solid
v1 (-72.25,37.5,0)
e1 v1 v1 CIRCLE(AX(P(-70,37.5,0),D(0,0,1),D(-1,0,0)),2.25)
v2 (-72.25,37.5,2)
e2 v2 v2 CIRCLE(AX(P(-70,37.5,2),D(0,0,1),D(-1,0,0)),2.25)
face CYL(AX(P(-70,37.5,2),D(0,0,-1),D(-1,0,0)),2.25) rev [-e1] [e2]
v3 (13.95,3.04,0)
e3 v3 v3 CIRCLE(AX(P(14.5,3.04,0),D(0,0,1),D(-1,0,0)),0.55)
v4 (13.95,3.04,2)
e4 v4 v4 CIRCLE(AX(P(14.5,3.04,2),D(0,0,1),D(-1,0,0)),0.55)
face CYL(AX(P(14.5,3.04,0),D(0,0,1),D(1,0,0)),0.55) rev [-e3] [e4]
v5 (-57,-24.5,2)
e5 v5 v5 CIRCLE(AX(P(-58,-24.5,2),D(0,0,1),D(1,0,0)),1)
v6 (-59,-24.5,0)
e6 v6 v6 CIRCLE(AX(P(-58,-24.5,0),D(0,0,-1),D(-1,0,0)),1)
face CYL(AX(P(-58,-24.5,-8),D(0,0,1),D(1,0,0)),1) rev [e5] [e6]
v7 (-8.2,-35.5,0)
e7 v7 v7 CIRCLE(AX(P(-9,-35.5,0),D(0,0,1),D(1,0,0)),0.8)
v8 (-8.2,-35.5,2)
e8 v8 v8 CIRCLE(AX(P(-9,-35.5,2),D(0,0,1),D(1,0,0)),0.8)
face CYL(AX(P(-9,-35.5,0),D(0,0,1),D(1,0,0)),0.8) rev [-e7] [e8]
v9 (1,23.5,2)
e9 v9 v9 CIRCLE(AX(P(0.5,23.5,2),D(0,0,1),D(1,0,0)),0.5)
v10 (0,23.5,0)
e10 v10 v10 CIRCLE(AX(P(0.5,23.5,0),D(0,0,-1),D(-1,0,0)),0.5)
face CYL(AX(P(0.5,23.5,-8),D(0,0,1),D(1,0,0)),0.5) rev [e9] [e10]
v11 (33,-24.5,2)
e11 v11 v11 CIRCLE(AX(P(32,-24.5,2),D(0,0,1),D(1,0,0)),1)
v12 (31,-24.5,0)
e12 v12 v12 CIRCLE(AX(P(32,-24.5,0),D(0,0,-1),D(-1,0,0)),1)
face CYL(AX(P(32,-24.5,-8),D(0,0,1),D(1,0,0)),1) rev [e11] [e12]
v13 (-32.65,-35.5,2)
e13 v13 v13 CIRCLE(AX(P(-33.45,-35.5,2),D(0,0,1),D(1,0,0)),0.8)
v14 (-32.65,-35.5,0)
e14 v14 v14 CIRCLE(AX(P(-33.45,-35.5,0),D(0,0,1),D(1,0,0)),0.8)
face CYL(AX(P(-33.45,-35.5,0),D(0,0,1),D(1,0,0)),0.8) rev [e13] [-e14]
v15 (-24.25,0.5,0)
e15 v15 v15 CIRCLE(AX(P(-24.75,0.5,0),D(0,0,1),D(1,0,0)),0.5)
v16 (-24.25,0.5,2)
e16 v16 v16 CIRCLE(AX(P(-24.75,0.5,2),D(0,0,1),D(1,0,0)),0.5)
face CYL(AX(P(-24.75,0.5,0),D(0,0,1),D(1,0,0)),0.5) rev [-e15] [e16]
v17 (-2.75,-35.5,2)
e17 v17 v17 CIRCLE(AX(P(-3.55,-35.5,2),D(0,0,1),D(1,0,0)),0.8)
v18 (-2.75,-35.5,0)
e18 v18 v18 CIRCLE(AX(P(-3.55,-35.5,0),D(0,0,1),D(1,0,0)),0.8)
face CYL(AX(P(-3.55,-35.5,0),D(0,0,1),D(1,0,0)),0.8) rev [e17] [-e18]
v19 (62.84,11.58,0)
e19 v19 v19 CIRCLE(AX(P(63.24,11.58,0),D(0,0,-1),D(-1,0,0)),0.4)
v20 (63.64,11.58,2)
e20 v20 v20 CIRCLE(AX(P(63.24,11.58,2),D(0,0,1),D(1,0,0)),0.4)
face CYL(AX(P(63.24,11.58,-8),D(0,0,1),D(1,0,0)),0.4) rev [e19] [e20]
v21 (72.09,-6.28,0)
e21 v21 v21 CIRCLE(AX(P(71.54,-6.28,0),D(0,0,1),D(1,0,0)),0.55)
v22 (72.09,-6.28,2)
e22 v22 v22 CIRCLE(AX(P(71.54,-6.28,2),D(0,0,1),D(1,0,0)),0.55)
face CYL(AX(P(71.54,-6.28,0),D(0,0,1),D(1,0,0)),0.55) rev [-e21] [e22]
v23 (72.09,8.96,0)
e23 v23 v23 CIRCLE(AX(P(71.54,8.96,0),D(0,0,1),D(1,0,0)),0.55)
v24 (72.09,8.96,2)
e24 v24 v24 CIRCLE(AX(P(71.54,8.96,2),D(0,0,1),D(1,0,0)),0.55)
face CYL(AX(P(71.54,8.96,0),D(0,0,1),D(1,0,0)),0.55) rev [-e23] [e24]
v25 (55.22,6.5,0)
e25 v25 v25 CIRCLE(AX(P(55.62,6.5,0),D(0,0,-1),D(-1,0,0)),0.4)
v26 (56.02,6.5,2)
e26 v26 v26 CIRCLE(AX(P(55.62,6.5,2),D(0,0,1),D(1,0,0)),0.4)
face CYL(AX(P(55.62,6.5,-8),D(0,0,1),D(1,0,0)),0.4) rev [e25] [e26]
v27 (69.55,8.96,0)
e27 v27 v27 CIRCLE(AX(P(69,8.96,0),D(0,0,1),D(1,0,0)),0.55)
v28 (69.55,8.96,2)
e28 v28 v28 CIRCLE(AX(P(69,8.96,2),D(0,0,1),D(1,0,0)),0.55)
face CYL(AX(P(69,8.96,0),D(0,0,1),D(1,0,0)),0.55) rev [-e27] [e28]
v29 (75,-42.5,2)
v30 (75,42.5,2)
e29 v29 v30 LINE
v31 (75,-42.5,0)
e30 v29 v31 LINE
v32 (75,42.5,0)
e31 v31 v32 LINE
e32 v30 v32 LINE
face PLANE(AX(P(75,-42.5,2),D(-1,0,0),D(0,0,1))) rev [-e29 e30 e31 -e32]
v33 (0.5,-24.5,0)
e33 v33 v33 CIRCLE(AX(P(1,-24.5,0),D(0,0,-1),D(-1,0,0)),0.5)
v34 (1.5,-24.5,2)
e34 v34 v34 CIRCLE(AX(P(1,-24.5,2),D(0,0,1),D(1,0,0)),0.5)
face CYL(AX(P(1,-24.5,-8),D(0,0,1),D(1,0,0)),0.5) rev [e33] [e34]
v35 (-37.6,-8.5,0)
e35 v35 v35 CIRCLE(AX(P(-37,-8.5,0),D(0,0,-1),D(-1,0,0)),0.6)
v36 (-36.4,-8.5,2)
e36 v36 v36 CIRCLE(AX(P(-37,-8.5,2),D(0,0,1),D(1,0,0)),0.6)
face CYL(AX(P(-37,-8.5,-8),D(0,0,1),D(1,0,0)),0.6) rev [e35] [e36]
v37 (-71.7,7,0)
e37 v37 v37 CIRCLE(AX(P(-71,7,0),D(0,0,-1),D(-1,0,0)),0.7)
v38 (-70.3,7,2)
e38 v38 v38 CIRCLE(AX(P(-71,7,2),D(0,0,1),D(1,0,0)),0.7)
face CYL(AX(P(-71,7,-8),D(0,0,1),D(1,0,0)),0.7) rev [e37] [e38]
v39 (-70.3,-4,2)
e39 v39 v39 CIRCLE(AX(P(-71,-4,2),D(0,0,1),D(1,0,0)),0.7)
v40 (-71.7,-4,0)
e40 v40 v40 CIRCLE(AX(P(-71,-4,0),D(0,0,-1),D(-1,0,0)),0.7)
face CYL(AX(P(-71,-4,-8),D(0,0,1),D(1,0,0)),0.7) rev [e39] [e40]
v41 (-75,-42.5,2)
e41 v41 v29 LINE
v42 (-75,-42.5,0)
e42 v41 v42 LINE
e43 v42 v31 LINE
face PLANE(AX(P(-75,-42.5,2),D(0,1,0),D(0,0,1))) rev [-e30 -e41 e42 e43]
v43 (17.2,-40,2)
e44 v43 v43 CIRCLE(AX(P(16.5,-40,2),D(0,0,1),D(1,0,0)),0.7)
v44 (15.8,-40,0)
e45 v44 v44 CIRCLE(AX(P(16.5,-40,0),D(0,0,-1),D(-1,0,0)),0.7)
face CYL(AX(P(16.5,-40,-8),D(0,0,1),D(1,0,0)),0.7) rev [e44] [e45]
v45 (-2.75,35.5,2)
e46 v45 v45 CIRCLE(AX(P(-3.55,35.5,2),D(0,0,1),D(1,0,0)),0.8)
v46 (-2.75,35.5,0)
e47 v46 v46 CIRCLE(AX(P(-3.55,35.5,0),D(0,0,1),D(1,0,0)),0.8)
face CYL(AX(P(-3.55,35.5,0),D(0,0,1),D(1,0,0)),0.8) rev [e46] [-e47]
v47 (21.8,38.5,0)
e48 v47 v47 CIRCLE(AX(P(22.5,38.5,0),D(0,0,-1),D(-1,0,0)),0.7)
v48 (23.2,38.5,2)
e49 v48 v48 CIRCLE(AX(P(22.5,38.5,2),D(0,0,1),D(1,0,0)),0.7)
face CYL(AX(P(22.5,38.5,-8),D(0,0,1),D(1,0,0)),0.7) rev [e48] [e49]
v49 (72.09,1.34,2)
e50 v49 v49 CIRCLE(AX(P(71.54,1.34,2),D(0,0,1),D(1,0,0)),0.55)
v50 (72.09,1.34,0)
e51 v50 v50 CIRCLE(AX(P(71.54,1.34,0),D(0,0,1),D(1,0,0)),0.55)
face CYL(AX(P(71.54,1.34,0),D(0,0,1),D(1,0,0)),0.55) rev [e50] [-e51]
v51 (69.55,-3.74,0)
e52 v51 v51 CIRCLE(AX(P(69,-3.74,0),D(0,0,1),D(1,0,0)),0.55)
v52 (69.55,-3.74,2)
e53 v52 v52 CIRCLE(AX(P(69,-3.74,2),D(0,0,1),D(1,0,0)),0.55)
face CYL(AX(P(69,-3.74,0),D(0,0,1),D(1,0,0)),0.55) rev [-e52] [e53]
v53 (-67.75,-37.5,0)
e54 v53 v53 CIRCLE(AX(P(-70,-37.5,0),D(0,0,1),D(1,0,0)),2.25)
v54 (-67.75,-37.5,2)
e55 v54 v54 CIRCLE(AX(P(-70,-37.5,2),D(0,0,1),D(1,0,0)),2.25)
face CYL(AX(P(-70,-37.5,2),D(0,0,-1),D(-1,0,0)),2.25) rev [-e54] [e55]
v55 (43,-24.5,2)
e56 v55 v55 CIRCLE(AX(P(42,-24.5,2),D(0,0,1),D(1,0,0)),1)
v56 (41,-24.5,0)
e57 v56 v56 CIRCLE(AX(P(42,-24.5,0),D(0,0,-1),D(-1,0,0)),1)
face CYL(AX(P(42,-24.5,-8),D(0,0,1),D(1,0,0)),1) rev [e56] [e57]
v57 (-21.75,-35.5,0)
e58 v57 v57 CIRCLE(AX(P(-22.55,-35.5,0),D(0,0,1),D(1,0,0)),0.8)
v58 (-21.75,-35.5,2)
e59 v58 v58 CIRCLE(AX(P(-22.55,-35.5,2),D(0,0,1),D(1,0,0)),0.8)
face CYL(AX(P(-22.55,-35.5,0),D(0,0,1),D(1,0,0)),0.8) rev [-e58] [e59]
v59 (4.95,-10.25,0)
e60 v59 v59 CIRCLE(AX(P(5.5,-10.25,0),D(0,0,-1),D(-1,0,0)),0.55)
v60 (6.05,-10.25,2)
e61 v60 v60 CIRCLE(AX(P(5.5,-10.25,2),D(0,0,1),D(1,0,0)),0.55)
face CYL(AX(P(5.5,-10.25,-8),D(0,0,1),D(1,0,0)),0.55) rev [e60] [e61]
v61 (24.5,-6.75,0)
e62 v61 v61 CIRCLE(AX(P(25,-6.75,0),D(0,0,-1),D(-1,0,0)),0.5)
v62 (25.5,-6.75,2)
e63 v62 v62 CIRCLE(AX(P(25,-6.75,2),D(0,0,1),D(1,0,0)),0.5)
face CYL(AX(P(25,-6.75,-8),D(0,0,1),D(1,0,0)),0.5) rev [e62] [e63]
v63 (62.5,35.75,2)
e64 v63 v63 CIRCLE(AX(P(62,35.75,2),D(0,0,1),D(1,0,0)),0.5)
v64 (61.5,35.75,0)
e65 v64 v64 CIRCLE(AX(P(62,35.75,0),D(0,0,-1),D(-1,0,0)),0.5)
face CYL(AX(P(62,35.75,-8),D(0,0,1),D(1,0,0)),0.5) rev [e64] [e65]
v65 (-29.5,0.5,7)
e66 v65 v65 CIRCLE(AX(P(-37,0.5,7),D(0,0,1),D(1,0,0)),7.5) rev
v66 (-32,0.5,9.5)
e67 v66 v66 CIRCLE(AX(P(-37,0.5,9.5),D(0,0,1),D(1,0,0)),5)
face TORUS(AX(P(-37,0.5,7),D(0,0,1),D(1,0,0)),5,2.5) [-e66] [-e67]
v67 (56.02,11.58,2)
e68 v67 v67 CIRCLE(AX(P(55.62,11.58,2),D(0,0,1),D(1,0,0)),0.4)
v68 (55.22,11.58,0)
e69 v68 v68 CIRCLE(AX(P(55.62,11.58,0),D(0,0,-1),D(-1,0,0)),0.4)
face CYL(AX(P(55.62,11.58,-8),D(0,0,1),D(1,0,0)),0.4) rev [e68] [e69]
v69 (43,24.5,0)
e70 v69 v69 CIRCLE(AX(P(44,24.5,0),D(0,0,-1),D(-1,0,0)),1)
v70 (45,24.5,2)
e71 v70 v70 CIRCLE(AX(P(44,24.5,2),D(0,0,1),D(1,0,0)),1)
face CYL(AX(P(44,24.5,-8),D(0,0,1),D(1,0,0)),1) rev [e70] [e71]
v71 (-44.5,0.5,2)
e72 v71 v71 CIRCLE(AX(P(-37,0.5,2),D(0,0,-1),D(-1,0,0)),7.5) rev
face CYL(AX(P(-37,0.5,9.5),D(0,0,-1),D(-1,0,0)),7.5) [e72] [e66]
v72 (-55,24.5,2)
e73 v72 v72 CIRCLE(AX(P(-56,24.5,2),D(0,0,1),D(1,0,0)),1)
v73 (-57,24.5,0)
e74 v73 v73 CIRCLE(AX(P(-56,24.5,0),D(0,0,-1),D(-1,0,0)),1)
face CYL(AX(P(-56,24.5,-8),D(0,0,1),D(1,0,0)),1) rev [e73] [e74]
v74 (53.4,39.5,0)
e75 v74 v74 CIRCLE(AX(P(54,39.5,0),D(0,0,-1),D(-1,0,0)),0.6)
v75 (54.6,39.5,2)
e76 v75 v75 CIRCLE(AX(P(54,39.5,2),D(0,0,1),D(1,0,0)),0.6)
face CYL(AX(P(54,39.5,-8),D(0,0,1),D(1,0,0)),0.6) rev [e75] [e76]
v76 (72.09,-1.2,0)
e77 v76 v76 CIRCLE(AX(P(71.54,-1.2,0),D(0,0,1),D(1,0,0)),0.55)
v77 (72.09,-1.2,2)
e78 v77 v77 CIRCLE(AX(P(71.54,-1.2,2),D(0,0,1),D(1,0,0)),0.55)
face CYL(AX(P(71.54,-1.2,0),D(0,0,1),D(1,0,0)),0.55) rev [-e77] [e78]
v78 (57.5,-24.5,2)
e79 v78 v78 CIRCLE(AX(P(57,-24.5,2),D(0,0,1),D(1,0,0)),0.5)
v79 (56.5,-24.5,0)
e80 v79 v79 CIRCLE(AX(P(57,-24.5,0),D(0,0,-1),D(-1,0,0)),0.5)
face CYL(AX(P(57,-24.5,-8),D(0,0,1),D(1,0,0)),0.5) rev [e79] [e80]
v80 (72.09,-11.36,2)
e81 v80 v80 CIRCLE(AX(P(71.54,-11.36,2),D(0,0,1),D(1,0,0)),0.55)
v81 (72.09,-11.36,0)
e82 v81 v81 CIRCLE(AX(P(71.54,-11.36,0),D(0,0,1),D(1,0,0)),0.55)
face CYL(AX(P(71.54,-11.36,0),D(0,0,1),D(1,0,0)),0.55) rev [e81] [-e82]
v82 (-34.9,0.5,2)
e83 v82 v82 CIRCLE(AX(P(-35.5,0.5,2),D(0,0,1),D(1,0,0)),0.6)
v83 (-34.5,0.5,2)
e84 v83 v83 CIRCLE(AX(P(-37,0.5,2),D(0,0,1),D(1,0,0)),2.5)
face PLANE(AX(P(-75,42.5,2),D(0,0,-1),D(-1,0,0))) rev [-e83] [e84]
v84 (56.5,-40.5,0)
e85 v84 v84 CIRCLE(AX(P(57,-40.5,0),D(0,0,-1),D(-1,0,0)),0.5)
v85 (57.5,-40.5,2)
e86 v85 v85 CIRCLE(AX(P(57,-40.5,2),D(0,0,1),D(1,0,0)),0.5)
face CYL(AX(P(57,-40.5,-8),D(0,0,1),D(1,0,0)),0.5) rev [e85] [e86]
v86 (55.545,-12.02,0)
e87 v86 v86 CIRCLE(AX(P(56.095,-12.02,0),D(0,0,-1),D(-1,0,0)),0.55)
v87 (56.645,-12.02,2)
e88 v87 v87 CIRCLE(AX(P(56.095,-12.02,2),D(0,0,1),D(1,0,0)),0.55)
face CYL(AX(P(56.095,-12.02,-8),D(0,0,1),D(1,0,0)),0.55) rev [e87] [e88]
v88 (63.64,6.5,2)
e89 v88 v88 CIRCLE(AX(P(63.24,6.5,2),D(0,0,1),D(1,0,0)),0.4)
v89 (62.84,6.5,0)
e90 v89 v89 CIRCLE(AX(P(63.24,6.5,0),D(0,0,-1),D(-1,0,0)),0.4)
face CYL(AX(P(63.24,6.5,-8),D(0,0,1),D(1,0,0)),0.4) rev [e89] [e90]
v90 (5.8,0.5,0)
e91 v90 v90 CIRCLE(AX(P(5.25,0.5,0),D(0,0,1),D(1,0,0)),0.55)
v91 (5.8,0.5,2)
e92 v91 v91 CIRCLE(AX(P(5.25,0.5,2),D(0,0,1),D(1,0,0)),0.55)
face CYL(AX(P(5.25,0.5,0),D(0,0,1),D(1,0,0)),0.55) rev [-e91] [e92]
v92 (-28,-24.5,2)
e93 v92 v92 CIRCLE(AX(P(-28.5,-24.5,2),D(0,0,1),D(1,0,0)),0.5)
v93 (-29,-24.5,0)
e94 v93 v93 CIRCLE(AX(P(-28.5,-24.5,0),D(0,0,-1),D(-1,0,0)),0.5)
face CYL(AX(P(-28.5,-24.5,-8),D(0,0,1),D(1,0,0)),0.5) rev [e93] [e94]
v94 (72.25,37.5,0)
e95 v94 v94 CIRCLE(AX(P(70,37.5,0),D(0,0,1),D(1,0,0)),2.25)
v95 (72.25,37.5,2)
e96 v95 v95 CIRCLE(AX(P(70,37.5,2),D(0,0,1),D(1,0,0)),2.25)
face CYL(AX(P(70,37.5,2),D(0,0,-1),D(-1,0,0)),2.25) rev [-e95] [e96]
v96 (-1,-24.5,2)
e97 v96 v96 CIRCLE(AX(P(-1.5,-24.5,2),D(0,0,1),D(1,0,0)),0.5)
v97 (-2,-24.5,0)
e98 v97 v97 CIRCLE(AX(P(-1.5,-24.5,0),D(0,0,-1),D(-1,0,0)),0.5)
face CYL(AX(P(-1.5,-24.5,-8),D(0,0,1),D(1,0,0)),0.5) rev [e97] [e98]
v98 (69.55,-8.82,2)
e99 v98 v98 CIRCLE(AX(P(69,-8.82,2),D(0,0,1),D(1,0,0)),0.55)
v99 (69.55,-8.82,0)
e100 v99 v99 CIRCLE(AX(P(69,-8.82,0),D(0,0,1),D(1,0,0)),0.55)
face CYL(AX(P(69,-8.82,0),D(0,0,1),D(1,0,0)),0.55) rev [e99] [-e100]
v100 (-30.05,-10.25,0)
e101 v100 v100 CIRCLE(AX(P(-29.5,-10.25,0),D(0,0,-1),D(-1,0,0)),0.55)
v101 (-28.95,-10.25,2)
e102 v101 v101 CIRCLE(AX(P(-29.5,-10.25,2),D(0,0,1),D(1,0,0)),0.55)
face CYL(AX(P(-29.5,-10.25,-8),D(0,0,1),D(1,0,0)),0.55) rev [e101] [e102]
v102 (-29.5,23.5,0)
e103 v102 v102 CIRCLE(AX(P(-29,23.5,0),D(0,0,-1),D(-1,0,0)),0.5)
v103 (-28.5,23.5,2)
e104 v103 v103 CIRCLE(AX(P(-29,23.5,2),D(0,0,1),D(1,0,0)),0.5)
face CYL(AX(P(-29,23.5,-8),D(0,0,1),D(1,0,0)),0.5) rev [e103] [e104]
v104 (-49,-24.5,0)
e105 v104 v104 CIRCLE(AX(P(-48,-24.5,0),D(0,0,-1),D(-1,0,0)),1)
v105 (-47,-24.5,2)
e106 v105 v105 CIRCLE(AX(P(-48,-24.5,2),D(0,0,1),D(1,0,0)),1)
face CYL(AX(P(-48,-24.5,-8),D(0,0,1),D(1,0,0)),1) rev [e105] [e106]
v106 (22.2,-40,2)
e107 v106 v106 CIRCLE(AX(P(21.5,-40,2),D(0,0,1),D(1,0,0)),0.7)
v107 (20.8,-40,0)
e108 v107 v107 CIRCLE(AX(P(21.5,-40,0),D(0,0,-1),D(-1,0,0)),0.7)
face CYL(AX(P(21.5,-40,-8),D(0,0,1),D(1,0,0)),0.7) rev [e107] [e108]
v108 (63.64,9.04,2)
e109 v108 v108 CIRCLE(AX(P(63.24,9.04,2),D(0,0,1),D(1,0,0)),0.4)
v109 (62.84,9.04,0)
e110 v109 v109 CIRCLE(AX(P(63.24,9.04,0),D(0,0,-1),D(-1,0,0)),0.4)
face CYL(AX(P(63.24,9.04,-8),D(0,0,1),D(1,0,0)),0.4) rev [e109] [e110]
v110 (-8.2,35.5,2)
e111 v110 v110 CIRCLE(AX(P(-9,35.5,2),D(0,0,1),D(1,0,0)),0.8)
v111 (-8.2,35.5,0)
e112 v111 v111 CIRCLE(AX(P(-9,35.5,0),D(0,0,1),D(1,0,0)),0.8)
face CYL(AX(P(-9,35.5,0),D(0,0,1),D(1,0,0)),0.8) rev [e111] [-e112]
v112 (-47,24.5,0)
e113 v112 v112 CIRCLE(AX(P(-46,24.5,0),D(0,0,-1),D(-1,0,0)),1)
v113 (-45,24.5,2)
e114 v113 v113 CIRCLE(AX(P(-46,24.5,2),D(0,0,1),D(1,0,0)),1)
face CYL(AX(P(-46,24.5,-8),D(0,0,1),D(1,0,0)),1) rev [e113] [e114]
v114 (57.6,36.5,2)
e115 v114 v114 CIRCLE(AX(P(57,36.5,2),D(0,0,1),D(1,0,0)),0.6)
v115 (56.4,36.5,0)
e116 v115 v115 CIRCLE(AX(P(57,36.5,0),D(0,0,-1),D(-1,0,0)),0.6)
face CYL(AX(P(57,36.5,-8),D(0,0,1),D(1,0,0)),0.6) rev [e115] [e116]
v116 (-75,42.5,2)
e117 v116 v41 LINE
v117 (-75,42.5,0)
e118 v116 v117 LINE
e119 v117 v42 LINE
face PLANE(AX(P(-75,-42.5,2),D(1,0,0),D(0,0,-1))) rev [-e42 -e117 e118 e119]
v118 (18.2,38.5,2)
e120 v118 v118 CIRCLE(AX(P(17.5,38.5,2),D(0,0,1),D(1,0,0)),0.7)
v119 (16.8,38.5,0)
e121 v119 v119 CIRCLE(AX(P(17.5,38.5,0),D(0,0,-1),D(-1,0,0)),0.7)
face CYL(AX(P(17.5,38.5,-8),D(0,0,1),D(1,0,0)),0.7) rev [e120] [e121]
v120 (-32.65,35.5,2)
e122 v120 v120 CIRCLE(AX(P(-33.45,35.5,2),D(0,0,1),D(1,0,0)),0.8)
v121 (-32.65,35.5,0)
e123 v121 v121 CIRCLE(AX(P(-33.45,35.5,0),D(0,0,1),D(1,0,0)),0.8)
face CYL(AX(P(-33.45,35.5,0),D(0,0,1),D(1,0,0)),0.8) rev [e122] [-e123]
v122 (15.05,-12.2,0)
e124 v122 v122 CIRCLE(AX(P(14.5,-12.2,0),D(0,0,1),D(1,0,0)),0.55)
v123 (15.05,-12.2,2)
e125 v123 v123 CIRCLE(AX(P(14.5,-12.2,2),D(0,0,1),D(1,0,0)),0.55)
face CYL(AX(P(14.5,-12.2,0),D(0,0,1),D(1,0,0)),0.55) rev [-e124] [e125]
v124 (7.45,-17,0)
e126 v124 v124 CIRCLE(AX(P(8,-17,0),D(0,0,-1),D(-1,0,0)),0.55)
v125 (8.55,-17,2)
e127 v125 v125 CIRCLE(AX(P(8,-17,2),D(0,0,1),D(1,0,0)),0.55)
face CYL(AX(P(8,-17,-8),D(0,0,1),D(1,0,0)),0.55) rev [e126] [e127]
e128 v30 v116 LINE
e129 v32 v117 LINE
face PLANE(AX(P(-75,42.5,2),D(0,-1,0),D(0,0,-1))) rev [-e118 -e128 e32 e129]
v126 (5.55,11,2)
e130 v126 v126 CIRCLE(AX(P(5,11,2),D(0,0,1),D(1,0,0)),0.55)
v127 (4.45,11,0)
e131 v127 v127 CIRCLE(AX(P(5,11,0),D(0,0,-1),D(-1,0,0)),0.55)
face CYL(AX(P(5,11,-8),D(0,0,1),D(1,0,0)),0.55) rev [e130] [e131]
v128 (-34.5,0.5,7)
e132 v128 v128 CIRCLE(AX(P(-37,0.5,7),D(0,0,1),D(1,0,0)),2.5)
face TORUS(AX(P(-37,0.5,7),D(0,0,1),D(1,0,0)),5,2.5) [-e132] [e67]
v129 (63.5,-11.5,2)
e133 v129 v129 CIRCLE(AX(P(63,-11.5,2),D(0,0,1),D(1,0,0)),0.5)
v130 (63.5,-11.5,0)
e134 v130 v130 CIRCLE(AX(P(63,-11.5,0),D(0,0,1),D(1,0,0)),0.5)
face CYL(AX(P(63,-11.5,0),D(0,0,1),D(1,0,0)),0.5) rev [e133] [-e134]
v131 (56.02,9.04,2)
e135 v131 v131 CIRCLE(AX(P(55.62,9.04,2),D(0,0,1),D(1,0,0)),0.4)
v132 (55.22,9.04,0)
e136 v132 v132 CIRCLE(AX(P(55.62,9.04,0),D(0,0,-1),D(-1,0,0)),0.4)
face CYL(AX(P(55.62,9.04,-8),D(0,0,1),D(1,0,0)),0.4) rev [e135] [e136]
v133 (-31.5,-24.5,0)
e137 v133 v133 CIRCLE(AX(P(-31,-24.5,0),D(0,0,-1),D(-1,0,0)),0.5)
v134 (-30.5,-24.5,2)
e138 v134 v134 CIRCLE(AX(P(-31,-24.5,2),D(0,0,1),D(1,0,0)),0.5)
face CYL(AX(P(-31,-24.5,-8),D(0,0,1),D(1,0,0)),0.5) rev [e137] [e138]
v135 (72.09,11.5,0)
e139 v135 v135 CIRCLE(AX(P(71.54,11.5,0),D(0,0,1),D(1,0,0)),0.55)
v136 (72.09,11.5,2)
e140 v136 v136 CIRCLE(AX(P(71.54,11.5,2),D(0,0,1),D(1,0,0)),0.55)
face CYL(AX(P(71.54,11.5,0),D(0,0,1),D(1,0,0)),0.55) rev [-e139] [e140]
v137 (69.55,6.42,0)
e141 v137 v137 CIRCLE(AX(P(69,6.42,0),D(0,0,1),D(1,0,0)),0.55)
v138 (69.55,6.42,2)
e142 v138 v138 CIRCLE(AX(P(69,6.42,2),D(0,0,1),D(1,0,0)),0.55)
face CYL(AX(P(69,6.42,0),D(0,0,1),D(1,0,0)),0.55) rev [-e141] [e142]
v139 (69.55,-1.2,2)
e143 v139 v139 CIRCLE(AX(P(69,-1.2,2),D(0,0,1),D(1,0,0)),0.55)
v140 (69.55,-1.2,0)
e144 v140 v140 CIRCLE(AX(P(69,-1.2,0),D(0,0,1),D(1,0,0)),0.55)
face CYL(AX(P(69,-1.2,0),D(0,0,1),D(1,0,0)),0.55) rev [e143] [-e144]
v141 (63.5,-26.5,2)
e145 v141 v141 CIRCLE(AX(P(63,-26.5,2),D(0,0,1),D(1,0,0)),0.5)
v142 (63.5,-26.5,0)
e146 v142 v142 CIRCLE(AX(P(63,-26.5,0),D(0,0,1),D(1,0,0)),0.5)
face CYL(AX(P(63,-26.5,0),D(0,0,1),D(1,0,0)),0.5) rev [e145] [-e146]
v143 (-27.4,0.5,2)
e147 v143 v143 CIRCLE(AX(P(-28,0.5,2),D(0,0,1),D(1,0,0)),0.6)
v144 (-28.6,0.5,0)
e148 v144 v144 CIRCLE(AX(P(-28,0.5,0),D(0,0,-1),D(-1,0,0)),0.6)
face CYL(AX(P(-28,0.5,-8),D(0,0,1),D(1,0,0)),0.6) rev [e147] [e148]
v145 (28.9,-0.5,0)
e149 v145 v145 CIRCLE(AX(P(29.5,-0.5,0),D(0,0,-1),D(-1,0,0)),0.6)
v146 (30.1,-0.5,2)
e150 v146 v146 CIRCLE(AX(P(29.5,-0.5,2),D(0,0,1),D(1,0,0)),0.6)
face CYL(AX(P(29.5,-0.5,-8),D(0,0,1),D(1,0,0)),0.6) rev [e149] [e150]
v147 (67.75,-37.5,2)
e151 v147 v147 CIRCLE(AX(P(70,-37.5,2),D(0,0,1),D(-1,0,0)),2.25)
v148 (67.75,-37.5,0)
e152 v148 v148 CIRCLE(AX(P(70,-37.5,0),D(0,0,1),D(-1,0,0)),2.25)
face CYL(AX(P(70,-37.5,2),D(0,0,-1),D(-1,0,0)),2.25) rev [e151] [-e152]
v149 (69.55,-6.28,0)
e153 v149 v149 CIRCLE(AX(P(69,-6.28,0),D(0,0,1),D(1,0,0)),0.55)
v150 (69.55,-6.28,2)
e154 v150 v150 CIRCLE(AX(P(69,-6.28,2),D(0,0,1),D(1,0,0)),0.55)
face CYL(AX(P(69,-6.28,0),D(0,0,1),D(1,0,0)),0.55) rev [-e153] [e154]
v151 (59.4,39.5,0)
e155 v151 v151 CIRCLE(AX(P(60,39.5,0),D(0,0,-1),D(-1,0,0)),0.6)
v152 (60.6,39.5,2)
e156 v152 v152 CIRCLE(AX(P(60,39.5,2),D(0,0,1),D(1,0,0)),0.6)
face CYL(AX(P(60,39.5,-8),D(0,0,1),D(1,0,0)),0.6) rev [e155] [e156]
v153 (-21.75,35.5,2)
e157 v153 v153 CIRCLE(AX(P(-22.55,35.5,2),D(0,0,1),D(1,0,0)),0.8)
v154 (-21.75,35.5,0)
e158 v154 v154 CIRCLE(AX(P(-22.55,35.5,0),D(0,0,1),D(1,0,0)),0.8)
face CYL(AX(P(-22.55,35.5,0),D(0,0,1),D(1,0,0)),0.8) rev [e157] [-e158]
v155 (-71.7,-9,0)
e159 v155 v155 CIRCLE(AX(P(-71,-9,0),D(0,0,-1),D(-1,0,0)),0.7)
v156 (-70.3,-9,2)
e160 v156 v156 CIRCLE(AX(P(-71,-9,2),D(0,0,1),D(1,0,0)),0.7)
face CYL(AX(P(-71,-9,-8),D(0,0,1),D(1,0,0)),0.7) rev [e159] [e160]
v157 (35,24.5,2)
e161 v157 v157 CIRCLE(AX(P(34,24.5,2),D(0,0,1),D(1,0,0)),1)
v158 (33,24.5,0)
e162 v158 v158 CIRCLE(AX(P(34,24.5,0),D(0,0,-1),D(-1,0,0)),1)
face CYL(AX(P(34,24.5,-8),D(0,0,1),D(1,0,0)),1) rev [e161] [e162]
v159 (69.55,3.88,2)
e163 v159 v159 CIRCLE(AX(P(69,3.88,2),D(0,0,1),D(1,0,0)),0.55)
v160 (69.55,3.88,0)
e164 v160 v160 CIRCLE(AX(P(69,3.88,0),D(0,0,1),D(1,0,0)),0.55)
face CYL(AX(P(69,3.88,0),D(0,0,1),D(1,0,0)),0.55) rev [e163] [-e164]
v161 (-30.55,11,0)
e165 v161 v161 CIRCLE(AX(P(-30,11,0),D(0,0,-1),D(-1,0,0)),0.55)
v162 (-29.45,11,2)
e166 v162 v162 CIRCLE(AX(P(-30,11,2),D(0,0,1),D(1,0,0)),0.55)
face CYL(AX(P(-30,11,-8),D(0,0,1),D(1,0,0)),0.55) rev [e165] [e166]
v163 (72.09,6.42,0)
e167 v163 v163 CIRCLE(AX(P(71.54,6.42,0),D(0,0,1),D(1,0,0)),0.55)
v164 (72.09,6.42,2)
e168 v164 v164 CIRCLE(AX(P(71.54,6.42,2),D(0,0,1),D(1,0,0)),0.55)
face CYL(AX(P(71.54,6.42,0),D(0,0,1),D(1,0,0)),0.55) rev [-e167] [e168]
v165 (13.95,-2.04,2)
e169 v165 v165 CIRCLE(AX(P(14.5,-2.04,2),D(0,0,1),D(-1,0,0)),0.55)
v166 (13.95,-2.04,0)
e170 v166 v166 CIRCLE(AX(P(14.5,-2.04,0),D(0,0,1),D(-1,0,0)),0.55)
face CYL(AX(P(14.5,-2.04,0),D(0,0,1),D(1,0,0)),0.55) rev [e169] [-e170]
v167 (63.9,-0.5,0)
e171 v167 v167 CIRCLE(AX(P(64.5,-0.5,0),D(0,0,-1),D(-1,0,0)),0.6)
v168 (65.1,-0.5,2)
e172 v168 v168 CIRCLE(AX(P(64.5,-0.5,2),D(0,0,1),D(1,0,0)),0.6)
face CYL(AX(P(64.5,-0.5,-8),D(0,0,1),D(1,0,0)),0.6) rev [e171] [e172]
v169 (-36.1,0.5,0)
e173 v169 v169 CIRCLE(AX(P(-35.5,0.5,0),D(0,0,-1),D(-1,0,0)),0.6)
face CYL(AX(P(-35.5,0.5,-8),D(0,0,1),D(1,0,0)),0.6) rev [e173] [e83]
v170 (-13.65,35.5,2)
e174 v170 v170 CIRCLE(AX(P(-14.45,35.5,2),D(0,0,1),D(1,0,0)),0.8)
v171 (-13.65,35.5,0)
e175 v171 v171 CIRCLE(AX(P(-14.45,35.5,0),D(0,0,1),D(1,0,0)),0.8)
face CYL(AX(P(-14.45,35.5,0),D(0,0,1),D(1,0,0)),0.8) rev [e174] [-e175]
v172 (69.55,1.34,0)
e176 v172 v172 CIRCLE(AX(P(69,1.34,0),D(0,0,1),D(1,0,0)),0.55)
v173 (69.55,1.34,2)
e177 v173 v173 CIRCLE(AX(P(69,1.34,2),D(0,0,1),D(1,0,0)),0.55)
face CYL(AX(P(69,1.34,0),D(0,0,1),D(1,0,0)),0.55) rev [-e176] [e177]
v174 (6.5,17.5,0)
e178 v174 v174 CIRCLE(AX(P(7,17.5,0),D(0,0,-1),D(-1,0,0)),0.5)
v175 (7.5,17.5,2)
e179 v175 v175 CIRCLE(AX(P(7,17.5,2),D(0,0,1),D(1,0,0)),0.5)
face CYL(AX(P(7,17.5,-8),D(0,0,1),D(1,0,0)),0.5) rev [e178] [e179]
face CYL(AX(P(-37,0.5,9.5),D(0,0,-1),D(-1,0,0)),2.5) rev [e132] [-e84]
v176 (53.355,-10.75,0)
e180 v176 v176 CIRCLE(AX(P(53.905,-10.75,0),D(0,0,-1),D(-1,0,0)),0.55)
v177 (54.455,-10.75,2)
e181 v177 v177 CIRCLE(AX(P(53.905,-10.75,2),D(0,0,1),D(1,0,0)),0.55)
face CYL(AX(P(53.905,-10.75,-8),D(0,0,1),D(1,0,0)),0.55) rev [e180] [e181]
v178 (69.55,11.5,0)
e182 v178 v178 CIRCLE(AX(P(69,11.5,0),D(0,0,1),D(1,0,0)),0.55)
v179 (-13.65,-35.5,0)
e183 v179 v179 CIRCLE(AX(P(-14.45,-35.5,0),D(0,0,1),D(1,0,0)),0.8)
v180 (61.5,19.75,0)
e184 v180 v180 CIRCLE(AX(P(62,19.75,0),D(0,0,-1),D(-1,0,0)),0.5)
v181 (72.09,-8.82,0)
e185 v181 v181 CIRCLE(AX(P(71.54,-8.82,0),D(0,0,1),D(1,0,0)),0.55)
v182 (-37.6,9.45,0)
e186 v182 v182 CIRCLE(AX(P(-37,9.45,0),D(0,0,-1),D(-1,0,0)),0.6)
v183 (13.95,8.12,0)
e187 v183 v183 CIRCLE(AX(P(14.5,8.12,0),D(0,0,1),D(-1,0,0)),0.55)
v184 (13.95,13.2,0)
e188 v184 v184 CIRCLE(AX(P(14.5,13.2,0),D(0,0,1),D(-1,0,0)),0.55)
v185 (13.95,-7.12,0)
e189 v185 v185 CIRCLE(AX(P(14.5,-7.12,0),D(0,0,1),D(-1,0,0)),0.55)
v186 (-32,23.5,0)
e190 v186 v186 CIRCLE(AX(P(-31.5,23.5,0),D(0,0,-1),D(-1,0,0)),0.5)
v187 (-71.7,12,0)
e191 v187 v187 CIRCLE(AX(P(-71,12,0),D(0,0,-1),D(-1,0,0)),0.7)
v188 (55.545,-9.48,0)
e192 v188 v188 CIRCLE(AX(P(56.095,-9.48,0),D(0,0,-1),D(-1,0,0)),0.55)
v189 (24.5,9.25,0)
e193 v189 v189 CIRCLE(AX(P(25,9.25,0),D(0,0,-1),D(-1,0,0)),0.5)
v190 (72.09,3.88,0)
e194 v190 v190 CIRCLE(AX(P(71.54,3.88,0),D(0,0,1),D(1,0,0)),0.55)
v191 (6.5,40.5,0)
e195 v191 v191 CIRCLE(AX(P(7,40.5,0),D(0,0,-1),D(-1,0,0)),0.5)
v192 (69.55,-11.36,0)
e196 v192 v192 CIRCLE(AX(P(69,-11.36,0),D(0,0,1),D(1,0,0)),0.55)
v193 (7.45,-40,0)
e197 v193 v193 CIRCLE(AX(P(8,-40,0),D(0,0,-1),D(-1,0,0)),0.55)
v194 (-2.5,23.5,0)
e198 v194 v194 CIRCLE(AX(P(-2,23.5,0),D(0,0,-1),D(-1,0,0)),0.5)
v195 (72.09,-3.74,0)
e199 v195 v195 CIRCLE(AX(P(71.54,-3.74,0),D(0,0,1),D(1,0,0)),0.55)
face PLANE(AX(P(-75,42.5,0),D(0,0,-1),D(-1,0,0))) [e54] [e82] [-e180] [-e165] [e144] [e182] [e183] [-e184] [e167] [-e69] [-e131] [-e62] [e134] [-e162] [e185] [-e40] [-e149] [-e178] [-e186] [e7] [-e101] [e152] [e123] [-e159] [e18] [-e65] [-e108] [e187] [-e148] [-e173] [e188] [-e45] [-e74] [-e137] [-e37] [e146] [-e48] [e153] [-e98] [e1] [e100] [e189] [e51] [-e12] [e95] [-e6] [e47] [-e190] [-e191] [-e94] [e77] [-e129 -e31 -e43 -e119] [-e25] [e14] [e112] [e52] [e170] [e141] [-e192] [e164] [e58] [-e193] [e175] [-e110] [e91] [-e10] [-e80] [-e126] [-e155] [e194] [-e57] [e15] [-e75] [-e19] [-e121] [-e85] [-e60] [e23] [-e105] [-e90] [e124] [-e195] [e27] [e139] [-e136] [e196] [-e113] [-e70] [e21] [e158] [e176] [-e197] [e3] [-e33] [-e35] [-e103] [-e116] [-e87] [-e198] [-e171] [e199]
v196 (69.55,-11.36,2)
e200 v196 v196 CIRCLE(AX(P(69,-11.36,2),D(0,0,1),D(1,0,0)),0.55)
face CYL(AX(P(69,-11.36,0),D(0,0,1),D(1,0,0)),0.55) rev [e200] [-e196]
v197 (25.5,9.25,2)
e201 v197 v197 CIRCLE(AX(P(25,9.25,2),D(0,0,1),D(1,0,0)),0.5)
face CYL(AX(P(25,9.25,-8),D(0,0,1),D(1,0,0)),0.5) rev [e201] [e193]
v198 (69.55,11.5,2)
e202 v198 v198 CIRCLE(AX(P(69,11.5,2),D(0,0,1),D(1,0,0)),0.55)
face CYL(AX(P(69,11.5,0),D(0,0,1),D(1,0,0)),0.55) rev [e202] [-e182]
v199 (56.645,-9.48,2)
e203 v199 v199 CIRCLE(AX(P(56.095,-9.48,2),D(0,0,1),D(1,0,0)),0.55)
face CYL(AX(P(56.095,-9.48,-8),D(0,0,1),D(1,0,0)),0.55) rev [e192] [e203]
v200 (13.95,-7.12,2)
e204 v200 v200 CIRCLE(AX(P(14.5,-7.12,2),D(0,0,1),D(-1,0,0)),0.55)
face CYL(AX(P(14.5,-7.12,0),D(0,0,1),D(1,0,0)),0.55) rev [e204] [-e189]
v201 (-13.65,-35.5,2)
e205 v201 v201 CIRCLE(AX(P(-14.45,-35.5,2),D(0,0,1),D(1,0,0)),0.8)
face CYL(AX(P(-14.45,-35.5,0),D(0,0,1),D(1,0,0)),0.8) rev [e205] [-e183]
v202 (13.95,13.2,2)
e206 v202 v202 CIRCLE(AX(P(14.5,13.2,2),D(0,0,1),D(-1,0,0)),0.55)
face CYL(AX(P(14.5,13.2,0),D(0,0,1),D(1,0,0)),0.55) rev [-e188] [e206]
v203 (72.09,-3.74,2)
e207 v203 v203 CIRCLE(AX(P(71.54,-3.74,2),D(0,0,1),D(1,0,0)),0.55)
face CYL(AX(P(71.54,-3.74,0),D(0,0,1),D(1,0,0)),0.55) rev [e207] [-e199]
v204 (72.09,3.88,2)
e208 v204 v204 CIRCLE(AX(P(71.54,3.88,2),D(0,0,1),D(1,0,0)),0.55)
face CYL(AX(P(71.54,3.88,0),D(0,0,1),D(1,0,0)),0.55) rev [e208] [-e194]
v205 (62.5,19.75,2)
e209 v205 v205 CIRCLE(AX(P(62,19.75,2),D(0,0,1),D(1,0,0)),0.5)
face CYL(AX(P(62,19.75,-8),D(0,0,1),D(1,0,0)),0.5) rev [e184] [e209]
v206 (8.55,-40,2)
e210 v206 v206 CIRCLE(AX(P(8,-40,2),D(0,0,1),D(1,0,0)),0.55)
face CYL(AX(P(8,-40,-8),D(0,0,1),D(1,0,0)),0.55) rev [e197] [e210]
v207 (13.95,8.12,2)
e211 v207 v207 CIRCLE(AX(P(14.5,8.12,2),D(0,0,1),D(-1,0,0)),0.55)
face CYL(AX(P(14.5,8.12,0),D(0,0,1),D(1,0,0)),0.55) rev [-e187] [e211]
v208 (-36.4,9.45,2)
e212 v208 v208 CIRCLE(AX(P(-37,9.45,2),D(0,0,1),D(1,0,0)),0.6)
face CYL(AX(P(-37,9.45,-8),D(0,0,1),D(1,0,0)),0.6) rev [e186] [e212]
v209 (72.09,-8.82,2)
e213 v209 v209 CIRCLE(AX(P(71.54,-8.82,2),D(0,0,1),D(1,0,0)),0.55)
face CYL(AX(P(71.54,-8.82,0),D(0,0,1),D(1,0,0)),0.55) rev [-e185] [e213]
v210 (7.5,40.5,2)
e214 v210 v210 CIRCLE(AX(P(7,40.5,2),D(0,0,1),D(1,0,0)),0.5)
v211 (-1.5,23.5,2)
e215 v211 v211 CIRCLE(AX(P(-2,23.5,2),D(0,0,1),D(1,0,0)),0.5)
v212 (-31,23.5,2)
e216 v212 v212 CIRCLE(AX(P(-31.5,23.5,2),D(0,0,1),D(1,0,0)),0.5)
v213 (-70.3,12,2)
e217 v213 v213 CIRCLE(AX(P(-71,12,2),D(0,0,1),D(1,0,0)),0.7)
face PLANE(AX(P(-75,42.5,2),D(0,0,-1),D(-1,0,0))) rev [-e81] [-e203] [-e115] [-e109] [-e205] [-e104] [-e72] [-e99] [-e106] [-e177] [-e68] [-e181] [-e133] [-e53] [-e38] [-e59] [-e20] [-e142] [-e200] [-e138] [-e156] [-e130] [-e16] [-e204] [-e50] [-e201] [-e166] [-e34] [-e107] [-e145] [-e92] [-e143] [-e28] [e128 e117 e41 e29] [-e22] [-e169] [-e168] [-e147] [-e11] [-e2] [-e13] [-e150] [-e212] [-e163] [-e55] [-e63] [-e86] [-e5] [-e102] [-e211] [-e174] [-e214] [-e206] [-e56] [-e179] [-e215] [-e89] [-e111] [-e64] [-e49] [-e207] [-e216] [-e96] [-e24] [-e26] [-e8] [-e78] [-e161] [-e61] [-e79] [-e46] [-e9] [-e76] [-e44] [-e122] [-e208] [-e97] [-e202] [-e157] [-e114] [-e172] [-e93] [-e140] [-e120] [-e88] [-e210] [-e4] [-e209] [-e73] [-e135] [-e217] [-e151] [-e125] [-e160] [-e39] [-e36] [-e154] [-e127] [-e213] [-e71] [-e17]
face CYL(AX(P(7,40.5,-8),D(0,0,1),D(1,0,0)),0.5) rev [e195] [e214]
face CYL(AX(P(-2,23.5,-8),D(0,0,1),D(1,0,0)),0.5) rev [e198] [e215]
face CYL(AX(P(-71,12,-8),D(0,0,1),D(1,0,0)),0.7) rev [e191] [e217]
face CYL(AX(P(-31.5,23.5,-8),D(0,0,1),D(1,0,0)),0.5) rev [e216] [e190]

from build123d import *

# Parameters (mm, degrees)
SKETCH_1_W          = 150
SKETCH_1_H          = 85
SKETCH_1_R          = 2.25
EXTRUDE_1_DEPTH     = 2
SKETCH_2_R          = 0.55
SKETCH_2_R_2        = 0.5
SKETCH_2_R_3        = 0.8
CUT_EXTRUDE_1_DEPTH = 2
SKETCH_3_R          = 1
SKETCH_3_R_2        = 0.6
SKETCH_3_R_3        = 0.55
SKETCH_3_R_4        = 0.7
SKETCH_3_R_5        = 0.5
SKETCH_3_R_6        = 0.4
CUT_EXTRUDE_2_DEPTH = 10
SKETCH_4_R          = 0.6
SKETCH_4_R_2        = 0.5
SKETCH_4_R_3        = 0.55
CUT_EXTRUDE_3_DEPTH = 10
SKETCH_5_R          = 7.5
SKETCH_5_R_2        = 2.5
EXTRUDE_2_DEPTH     = 7.5
FILLET_1_R          = 2.5


with BuildPart() as part:
    # Эскиз1 → Вытянуть1 (new body)
    with BuildSketch(Plane.XY):
        Rectangle(SKETCH_1_W, SKETCH_1_H)
        with Locations((-70, -37.5)):
            Circle(SKETCH_1_R, mode=Mode.SUBTRACT)
        with Locations(Location((70, -37.5, 0), (0, 0, 180))):
            Circle(SKETCH_1_R, mode=Mode.SUBTRACT)
        with Locations((70, 37.5)):
            Circle(SKETCH_1_R, mode=Mode.SUBTRACT)
        with Locations(Location((-70, 37.5, 0), (0, 0, 180))):
            Circle(SKETCH_1_R, mode=Mode.SUBTRACT)
    extrude(amount=EXTRUDE_1_DEPTH)

    # Эскиз2 → Вырез-Вытянуть1 (cut)
    with BuildSketch(Plane.XY.offset(2)):
        with Locations((69, 11.5)):
            Circle(SKETCH_2_R)
        with Locations((71.54, 11.5)):
            Circle(SKETCH_2_R)
        with Locations((69, 8.96)):
            Circle(SKETCH_2_R)
        with Locations((71.54, 8.96)):
            Circle(SKETCH_2_R)
        with Locations((69, 6.42)):
            Circle(SKETCH_2_R)
        with Locations((71.54, 6.42)):
            Circle(SKETCH_2_R)
        with Locations((69, 3.88)):
            Circle(SKETCH_2_R)
        with Locations((71.54, 3.88)):
            Circle(SKETCH_2_R)
        with Locations((69, 1.34)):
            Circle(SKETCH_2_R)
        with Locations((71.54, 1.34)):
            Circle(SKETCH_2_R)
        with Locations((69, -1.2)):
            Circle(SKETCH_2_R)
        with Locations((71.54, -1.2)):
            Circle(SKETCH_2_R)
        with Locations((69, -3.74)):
            Circle(SKETCH_2_R)
        with Locations((71.54, -3.74)):
            Circle(SKETCH_2_R)
        with Locations((69, -6.28)):
            Circle(SKETCH_2_R)
        with Locations((71.54, -6.28)):
            Circle(SKETCH_2_R)
        with Locations((69, -8.82)):
            Circle(SKETCH_2_R)
        with Locations((71.54, -8.82)):
            Circle(SKETCH_2_R)
        with Locations((69, -11.36)):
            Circle(SKETCH_2_R)
        with Locations((71.54, -11.36)):
            Circle(SKETCH_2_R)
        with Locations((63, -26.5)):
            Circle(SKETCH_2_R_2)
        with Locations((63, -11.5)):
            Circle(SKETCH_2_R_2)
        with Locations((-14.45, 35.5)):
            Circle(SKETCH_2_R_3)
        with Locations((-9, 35.5)):
            Circle(SKETCH_2_R_3)
        with Locations((-3.55, 35.5)):
            Circle(SKETCH_2_R_3)
        with Locations((-33.45, 35.5)):
            Circle(SKETCH_2_R_3)
        with Locations((-24.75, 0.5)):
            Circle(SKETCH_2_R_2)
        with Locations((-22.55, 35.5)):
            Circle(SKETCH_2_R_3)
        with Locations((-33.45, -35.5)):
            Circle(SKETCH_2_R_3)
        with Locations((5.25, 0.5)):
            Circle(SKETCH_2_R)
        with Locations((-22.55, -35.5)):
            Circle(SKETCH_2_R_3)
        with Locations((-14.45, -35.5)):
            Circle(SKETCH_2_R_3)
        with Locations((-9, -35.5)):
            Circle(SKETCH_2_R_3)
        with Locations((-3.55, -35.5)):
            Circle(SKETCH_2_R_3)
        with Locations(Location((14.5, 13.2, 0), (0, 0, 180))):
            Circle(SKETCH_2_R)
        with Locations(Location((14.5, 8.12, 0), (0, 0, 180))):
            Circle(SKETCH_2_R)
        with Locations(Location((14.5, -2.04, 0), (0, 0, 180))):
            Circle(SKETCH_2_R)
        with Locations(Location((14.5, 3.04, 0), (0, 0, 180))):
            Circle(SKETCH_2_R)
        with Locations(Location((14.5, -7.12, 0), (0, 0, 180))):
            Circle(SKETCH_2_R)
        with Locations((14.5, -12.2)):
            Circle(SKETCH_2_R)
    extrude(amount=-CUT_EXTRUDE_1_DEPTH, mode=Mode.SUBTRACT)

    # Эскиз3 → Вырез-Вытянуть2 (cut)
    with BuildSketch(Plane.XY.offset(2)):
        with Locations((-56, 24.5)):
            Circle(SKETCH_3_R)
        with Locations((-46, 24.5)):
            Circle(SKETCH_3_R)
        with Locations((-58, -24.5)):
            Circle(SKETCH_3_R)
        with Locations((-48, -24.5)):
            Circle(SKETCH_3_R)
        with Locations((54, 39.5)):
            Circle(SKETCH_3_R_2)
        with Locations((60, 39.5)):
            Circle(SKETCH_3_R_2)
        with Locations((56.095, -9.48)):
            Circle(SKETCH_3_R_3)
        with Locations((56.095, -12.02)):
            Circle(SKETCH_3_R_3)
        with Locations((53.905, -10.75)):
            Circle(SKETCH_3_R_3)
        with Locations((16.5, -40)):
            Circle(SKETCH_3_R_4)
        with Locations((21.5, -40)):
            Circle(SKETCH_3_R_4)
        with Locations((-71, 7)):
            Circle(SKETCH_3_R_4)
        with Locations((-71, 12)):
            Circle(SKETCH_3_R_4)
        with Locations((-71, -9)):
            Circle(SKETCH_3_R_4)
        with Locations((-71, -4)):
            Circle(SKETCH_3_R_4)
        with Locations((25, -6.75)):
            Circle(SKETCH_3_R_5)
        with Locations((25, 9.25)):
            Circle(SKETCH_3_R_5)
        with Locations((57, -40.5)):
            Circle(SKETCH_3_R_5)
        with Locations((57, -24.5)):
            Circle(SKETCH_3_R_5)
        with Locations((34, 24.5)):
            Circle(SKETCH_3_R)
        with Locations((44, 24.5)):
            Circle(SKETCH_3_R)
        with Locations((32, -24.5)):
            Circle(SKETCH_3_R)
        with Locations((42, -24.5)):
            Circle(SKETCH_3_R)
        with Locations((57, 36.5)):
            Circle(SKETCH_3_R_2)
        with Locations((17.5, 38.5)):
            Circle(SKETCH_3_R_4)
        with Locations((62, 19.75)):
            Circle(SKETCH_3_R_5)
        with Locations((62, 35.75)):
            Circle(SKETCH_3_R_5)
        with Locations((63.24, 11.58)):
            Circle(SKETCH_3_R_6)
        with Locations((63.24, 6.5)):
            Circle(SKETCH_3_R_6)
        with Locations((55.62, 9.04)):
            Circle(SKETCH_3_R_6)
        with Locations((63.24, 9.04)):
            Circle(SKETCH_3_R_6)
        with Locations((55.62, 6.5)):
            Circle(SKETCH_3_R_6)
        with Locations((55.62, 11.58)):
            Circle(SKETCH_3_R_6)
        with Locations((22.5, 38.5)):
            Circle(SKETCH_3_R_4)
        with Locations((64.5, -0.5)):
            Circle(SKETCH_3_R_2)
        with Locations((29.5, -0.5)):
            Circle(SKETCH_3_R_2)
    extrude(amount=-CUT_EXTRUDE_2_DEPTH, mode=Mode.SUBTRACT)

    # Эскиз4 → Вырез-Вытянуть3 (cut)
    with BuildSketch(Plane.XY.offset(2)):
        with Locations((-37, -8.5)):
            Circle(SKETCH_4_R)
        with Locations((-28, 0.5)):
            Circle(SKETCH_4_R)
        with Locations((-31.5, 23.5)):
            Circle(SKETCH_4_R_2)
        with Locations((-37, 9.45)):
            Circle(SKETCH_4_R)
        with Locations((0.5, 23.5)):
            Circle(SKETCH_4_R_2)
        with Locations((-29, 23.5)):
            Circle(SKETCH_4_R_2)
        with Locations((-11, 51)):
            Circle(SKETCH_4_R_2)
        with Locations((-11, 74)):
            Circle(SKETCH_4_R_2)
        with Locations((-2, 23.5)):
            Circle(SKETCH_4_R_2)
        with Locations((8, -40)):
            Circle(SKETCH_4_R_3)
        with Locations((8, -17)):
            Circle(SKETCH_4_R_3)
        with Locations((-68, 56)):
            Circle(SKETCH_4_R_2)
        with Locations((-68, 51)):
            Circle(SKETCH_4_R_2)
        with Locations((7, 17.5)):
            Circle(SKETCH_4_R_2)
        with Locations((7, 40.5)):
            Circle(SKETCH_4_R_2)
        with Locations((-52, 56)):
            Circle(SKETCH_4_R_2)
        with Locations((-52, 51)):
            Circle(SKETCH_4_R_2)
        with Locations((-30, 11)):
            Circle(SKETCH_4_R_3)
        with Locations((5, 11)):
            Circle(SKETCH_4_R_3)
        with Locations((-35.5, 0.5)):
            Circle(SKETCH_4_R)
        with Locations((-29.5, -10.25)):
            Circle(SKETCH_4_R_3)
        with Locations((5.5, -10.25)):
            Circle(SKETCH_4_R_3)
        with Locations((-31, -24.5)):
            Circle(SKETCH_4_R_2)
        with Locations((1, -24.5)):
            Circle(SKETCH_4_R_2)
        with Locations((-28.5, -24.5)):
            Circle(SKETCH_4_R_2)
        with Locations((-1.5, -24.5)):
            Circle(SKETCH_4_R_2)
    extrude(amount=-CUT_EXTRUDE_3_DEPTH, mode=Mode.SUBTRACT)

    # Эскиз5 → Вытянуть2 (add)
    with BuildSketch(Plane.XY.offset(2)):
        with Locations(Location((-37, 0.5, 0), (0, 0, 180))):
            Circle(SKETCH_5_R)
        with Locations((-37, 0.5)):
            Circle(SKETCH_5_R_2, mode=Mode.SUBTRACT)
    extrude(amount=EXTRUDE_2_DEPTH)

    # Скругление1
    fillet_1_edges = [part.edges().sort_by_distance(p)[0] for p in [
        (-29.5, 0.5, 9.5),
        (-39.5, 0.5, 9.5),
    ]]
    fillet(fillet_1_edges, radius=FILLET_1_R - 0.0001)  # a hair under: the kernel refuses the full size


solid = part.part
